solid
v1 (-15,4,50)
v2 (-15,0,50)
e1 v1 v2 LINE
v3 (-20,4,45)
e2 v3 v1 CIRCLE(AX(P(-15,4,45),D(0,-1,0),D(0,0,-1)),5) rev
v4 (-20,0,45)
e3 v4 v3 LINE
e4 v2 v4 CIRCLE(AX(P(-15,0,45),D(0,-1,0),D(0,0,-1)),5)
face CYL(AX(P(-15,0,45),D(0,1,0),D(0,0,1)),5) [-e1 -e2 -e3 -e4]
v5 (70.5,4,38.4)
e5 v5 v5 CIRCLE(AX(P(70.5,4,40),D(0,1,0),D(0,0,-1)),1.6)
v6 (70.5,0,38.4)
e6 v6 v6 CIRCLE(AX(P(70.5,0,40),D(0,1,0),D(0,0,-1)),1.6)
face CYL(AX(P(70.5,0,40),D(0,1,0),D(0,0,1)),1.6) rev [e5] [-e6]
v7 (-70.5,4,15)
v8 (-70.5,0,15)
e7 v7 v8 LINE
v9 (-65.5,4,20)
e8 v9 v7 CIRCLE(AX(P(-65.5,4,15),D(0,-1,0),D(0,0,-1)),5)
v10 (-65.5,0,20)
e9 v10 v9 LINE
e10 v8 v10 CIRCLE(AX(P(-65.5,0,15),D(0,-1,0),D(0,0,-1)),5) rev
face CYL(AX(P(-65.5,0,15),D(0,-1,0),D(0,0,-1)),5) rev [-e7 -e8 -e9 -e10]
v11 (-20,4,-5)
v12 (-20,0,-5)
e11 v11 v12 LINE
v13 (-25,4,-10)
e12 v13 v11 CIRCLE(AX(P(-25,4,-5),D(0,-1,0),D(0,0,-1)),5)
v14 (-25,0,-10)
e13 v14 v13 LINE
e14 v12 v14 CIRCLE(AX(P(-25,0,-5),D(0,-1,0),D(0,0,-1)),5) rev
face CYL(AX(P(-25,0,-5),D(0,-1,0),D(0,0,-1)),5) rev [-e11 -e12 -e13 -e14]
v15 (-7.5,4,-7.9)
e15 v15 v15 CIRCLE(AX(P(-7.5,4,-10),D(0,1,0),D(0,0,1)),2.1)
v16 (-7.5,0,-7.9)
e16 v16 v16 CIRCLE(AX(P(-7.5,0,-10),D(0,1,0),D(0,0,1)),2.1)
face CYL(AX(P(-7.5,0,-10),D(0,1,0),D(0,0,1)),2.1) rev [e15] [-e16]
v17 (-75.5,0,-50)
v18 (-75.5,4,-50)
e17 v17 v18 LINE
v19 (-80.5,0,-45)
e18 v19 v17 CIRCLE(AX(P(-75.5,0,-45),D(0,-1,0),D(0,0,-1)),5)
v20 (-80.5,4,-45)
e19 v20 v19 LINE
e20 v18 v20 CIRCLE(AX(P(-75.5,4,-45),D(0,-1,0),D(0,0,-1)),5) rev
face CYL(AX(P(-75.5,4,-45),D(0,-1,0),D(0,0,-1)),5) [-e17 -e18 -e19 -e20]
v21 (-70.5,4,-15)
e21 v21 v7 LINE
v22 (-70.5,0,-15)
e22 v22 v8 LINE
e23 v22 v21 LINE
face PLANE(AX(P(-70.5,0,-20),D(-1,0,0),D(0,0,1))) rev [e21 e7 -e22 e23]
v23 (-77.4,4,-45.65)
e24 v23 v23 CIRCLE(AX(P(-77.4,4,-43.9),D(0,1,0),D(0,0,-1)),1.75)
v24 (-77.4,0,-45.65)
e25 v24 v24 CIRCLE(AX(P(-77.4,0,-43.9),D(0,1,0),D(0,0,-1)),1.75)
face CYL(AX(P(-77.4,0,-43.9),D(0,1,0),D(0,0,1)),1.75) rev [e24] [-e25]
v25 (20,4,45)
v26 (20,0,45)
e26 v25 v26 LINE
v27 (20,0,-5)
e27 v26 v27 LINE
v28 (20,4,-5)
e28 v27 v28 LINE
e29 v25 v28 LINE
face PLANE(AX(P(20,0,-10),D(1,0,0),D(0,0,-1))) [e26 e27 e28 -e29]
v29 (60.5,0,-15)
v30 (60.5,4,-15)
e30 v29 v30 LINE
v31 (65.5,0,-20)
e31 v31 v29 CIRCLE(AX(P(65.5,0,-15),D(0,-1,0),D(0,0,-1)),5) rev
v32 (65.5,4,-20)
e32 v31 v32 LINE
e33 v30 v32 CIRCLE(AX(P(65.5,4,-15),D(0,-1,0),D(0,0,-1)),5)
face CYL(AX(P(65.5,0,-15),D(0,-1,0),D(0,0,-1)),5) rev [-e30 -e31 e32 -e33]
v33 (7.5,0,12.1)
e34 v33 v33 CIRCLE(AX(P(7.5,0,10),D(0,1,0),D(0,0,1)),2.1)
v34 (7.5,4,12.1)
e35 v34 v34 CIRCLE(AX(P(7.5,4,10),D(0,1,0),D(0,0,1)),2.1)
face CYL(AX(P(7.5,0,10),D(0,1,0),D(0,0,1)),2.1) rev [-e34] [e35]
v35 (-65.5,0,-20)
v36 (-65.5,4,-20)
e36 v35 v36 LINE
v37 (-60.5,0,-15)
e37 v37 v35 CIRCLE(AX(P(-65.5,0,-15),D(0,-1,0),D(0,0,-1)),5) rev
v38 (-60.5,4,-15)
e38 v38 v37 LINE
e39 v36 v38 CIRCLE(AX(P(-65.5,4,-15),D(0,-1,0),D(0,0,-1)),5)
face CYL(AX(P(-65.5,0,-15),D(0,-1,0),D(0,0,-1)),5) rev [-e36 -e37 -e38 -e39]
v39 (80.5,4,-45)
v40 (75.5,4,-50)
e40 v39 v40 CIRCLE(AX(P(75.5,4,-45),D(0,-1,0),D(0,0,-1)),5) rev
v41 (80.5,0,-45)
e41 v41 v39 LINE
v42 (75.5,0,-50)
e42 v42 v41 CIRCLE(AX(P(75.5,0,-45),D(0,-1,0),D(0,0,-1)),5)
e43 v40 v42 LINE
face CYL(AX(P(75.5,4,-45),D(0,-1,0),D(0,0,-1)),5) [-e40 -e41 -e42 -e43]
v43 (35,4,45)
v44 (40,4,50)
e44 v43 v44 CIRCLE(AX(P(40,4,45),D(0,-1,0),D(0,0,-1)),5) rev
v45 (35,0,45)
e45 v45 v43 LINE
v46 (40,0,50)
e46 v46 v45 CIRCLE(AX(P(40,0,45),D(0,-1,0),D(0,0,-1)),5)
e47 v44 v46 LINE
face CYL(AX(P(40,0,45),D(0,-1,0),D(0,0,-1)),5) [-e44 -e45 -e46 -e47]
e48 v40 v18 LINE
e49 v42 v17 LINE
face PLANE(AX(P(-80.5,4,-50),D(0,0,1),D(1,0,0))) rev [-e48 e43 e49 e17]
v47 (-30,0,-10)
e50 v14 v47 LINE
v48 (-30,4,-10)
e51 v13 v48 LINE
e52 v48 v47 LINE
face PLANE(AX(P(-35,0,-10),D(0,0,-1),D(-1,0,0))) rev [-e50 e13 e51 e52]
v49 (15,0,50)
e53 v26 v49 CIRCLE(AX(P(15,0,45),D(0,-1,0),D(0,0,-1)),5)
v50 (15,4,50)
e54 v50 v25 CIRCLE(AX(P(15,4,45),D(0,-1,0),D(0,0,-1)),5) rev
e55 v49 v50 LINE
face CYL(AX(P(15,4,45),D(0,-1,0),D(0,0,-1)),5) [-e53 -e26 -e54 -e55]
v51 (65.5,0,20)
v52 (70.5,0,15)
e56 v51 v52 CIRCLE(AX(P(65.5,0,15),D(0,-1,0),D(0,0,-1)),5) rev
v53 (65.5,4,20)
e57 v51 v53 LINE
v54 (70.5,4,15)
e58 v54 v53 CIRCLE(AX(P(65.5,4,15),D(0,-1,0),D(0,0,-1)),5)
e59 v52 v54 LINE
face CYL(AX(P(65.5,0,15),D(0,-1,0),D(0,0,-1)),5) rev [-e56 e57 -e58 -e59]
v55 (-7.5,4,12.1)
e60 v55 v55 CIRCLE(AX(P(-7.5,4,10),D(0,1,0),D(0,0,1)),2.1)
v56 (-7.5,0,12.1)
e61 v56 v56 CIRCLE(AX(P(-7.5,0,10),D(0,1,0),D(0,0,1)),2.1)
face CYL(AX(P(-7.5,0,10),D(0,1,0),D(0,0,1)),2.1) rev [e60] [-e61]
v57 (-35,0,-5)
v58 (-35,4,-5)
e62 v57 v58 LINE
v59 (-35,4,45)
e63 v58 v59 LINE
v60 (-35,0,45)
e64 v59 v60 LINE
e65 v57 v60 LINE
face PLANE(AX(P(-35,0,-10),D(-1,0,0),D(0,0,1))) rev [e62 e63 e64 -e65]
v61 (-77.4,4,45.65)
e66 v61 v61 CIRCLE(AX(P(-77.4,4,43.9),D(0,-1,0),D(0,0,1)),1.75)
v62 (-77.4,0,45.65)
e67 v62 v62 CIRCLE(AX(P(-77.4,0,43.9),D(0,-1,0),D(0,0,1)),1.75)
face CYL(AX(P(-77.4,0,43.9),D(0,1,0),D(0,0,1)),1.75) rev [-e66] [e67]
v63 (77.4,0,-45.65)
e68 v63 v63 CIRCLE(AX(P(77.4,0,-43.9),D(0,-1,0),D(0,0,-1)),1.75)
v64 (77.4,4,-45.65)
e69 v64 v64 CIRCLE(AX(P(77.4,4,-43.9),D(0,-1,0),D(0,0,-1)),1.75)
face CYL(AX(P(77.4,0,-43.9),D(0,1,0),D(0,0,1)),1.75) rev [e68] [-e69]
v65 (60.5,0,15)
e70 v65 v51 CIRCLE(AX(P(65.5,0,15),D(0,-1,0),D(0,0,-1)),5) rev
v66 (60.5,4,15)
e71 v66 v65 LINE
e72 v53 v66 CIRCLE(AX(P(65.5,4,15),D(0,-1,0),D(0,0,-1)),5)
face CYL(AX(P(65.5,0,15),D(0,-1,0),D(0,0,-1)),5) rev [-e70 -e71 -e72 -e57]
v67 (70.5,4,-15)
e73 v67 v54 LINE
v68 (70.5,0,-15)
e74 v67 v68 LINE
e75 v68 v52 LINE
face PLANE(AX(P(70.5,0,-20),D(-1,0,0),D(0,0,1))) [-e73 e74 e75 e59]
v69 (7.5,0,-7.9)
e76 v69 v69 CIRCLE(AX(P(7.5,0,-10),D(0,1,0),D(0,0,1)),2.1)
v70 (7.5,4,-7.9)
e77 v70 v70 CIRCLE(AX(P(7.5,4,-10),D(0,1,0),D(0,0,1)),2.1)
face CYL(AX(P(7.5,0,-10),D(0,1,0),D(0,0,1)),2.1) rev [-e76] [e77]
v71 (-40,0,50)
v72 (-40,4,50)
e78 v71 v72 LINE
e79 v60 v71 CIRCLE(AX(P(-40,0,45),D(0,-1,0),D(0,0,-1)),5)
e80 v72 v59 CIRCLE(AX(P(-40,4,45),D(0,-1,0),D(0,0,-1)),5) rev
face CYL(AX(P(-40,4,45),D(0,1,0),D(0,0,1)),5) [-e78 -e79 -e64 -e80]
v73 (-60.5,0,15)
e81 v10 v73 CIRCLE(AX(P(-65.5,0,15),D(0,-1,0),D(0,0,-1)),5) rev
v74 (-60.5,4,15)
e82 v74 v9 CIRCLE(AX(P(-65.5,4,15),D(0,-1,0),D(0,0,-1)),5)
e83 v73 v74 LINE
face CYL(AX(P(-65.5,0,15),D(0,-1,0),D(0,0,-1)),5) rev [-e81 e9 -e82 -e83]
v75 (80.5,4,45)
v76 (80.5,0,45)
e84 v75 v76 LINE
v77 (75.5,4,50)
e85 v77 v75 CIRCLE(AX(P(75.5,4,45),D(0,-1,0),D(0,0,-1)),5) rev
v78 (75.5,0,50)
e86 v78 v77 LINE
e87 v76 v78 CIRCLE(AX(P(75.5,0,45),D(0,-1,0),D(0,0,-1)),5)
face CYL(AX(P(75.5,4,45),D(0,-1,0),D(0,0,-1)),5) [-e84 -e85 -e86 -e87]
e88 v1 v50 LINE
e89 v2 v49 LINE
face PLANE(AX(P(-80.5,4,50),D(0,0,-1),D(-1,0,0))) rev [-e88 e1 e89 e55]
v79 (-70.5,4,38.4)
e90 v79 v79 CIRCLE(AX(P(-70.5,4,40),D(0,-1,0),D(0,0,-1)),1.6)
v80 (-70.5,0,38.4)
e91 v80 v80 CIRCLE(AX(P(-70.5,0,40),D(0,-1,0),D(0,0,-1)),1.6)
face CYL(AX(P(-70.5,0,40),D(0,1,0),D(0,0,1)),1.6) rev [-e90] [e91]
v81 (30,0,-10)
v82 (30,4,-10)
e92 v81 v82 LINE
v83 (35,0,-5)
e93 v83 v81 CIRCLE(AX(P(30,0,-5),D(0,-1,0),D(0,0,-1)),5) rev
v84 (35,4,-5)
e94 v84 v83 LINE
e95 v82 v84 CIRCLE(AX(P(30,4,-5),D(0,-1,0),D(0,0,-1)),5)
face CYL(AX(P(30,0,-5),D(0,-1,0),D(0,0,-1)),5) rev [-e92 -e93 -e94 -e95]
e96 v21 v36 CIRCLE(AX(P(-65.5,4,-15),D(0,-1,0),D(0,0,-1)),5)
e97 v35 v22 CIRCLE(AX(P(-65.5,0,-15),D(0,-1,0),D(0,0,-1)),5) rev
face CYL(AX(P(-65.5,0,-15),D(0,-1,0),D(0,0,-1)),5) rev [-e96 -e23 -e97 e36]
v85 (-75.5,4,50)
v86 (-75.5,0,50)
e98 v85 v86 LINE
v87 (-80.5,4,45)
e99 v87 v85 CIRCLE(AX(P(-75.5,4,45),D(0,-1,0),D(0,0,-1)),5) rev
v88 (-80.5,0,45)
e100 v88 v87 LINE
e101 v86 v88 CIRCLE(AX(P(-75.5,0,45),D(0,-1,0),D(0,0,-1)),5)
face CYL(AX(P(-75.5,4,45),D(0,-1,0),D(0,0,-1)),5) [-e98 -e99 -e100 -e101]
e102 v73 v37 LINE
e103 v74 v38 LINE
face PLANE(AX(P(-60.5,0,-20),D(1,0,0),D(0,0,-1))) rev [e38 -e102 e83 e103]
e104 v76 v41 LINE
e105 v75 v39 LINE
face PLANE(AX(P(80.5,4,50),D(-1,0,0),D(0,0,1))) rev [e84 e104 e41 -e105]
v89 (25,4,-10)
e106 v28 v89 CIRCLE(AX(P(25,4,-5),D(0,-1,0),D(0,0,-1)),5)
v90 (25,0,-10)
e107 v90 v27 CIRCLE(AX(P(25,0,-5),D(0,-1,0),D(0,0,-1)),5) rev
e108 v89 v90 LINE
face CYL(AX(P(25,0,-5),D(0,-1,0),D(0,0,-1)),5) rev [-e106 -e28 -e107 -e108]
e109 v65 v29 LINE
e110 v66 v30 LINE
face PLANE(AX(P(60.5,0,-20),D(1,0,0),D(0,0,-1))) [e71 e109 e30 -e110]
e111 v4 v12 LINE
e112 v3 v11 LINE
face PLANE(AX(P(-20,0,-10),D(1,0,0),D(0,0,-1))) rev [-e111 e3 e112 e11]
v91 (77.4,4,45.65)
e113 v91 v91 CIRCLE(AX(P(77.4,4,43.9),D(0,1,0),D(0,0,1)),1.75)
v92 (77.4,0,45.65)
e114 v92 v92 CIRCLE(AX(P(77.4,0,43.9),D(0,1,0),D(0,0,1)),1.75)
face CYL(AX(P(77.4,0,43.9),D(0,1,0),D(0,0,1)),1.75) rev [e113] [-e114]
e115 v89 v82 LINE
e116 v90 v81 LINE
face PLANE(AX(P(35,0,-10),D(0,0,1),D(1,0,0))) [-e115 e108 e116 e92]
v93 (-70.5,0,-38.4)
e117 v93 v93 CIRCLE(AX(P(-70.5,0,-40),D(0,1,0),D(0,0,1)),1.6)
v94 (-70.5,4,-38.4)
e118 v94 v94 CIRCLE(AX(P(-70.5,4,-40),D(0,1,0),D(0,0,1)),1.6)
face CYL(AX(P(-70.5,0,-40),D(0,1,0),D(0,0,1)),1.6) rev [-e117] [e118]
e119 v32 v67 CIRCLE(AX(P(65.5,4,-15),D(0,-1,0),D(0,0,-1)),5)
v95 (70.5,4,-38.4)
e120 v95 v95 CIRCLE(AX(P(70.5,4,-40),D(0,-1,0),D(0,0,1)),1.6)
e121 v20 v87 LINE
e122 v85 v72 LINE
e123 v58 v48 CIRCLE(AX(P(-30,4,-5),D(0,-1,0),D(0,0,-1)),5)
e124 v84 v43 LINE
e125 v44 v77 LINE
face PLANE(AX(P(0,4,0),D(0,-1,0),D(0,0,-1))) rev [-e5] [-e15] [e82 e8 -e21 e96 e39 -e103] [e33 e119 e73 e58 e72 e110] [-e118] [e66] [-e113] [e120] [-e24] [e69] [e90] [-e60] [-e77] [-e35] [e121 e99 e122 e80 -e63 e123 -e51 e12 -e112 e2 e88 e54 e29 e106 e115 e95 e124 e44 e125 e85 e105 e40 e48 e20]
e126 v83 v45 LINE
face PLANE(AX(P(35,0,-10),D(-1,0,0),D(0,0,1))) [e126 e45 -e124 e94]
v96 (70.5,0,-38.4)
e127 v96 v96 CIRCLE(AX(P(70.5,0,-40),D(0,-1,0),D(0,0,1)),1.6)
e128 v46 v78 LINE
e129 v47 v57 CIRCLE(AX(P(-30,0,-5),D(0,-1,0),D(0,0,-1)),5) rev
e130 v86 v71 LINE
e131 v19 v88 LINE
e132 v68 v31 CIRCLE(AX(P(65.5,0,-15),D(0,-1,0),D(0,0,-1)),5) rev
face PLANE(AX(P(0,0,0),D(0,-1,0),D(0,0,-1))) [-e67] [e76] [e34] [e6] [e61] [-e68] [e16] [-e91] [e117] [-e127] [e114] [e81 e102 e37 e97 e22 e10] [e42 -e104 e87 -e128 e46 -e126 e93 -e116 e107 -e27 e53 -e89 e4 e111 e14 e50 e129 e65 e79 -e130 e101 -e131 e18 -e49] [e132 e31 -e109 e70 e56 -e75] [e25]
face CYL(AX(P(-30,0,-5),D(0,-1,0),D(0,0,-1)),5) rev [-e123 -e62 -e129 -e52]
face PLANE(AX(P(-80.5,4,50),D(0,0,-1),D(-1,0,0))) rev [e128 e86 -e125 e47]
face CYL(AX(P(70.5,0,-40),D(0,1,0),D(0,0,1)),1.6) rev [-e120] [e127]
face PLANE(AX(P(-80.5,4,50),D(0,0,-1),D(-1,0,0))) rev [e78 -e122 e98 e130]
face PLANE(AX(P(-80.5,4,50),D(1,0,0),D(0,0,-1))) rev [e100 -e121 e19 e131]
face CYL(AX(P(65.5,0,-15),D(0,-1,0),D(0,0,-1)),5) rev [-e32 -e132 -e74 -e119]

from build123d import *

# Parameters (mm, degrees)
SKETCH1_W               = 161
SKETCH1_H               = 100
BOSS_EXTRUDE1_DEPTH     = 4
SKETCH2_R               = 1.75
CUT_EXTRUDE1_DEPTH      = 95.84856351
MIRROR2_COPY_1_SKETCH_R = 1.75
MIRROR2_COPY_1_DEPTH    = 95.84856351
SKETCH3_W               = 15
SKETCH3_H               = 60
CUT_EXTRUDE2_DEPTH      = 95.84856351
SKETCH4_R               = 1.6
CUT_EXTRUDE3_DEPTH      = 95.84856351
MIRROR5_COPY_1_SKETCH_R = 1.6
MIRROR5_COPY_1_DEPTH    = 95.84856351
SKETCH5_R               = 2.1
CUT_EXTRUDE4_DEPTH      = 95.84856351
SKETCH6_W               = 10
SKETCH6_H               = 40
CUT_EXTRUDE5_DEPTH      = 95.84856351
FILLET1_R               = 5


with BuildPart() as part:
    # Sketch1 → Boss-Extrude1 (new body)
    with BuildSketch(Plane(origin=(0, 0, 0), x_dir=(1, 0, 0), z_dir=(0, 1, 0))):
        Rectangle(SKETCH1_W, SKETCH1_H)
    extrude(amount=BOSS_EXTRUDE1_DEPTH)

    # Sketch2 → Cut-Extrude1 (cut, through all)
    with BuildSketch(Plane(origin=(0, 4, 0), x_dir=(1, 0, 0), z_dir=(0, 1, 0))):
        with Locations(Location((77.4, -43.9, 0), (0, 0, 270))):
            Circle(SKETCH2_R)
    cut_extrude1 = extrude(amount=-CUT_EXTRUDE1_DEPTH, mode=Mode.SUBTRACT)

    # Mirror1: Cut-Extrude1 across plane
    add(cut_extrude1.mirror(Plane.XY), mode=Mode.SUBTRACT)

    # Mirror2: Cut-Extrude1 across plane
    add(cut_extrude1.mirror(Plane(origin=(0, 0, 0), x_dir=(0, 0, 1), z_dir=(1, 0, 0))), mode=Mode.SUBTRACT)

    # Mirror2 copy 1 sketch → Mirror2 copy 1 (cut, through all)
    with BuildSketch(Plane(origin=(0, 4, 0), x_dir=(-1, 0, 0), z_dir=(0, 1, 0))):
        with Locations(Location((77.4, -43.9, 0), (0, 0, 270))):
            Circle(MIRROR2_COPY_1_SKETCH_R)
    extrude(amount=-MIRROR2_COPY_1_DEPTH, mode=Mode.SUBTRACT)

    # Sketch3 → Cut-Extrude2 (cut, through all)
    with BuildSketch(Plane(origin=(0, 4, 0), x_dir=(1, 0, 0), z_dir=(0, 1, 0))):
        with Locations((-27.5, -20)):
            Rectangle(SKETCH3_W, SKETCH3_H)
    cut_extrude2 = extrude(amount=-CUT_EXTRUDE2_DEPTH, mode=Mode.SUBTRACT)

    # Mirror3: Cut-Extrude2 across plane
    add(cut_extrude2.mirror(Plane(origin=(0, 0, 0), x_dir=(0, 0, 1), z_dir=(1, 0, 0))), mode=Mode.SUBTRACT)

    # Sketch4 → Cut-Extrude3 (cut, through all)
    with BuildSketch(Plane(origin=(0, 4, 0), x_dir=(1, 0, 0), z_dir=(0, 1, 0))):
        with Locations(Location((-70.5, 40, 0), (0, 0, 270))):
            Circle(SKETCH4_R)
    cut_extrude3 = extrude(amount=-CUT_EXTRUDE3_DEPTH, mode=Mode.SUBTRACT)

    # Mirror4: Cut-Extrude3 across plane
    add(cut_extrude3.mirror(Plane.XY), mode=Mode.SUBTRACT)

    # Mirror5: Cut-Extrude3 across plane
    add(cut_extrude3.mirror(Plane(origin=(0, 0, 0), x_dir=(0, 0, 1), z_dir=(1, 0, 0))), mode=Mode.SUBTRACT)

    # Mirror5 copy 1 sketch → Mirror5 copy 1 (cut, through all)
    with BuildSketch(Plane(origin=(0, 4, 0), x_dir=(-1, 0, 0), z_dir=(0, 1, 0))):
        with Locations(Location((-70.5, 40, 0), (0, 0, 270))):
            Circle(MIRROR5_COPY_1_SKETCH_R)
    extrude(amount=-MIRROR5_COPY_1_DEPTH, mode=Mode.SUBTRACT)

    # Sketch5 → Cut-Extrude4 (cut, through all)
    with BuildSketch(Plane(origin=(0, 4, 0), x_dir=(1, 0, 0), z_dir=(0, 1, 0))):
        with Locations(Location((-7.5, 10, 0), (0, 0, 270))):
            Circle(SKETCH5_R)
        with Locations(Location((7.5, 10, 0), (0, 0, 270))):
            Circle(SKETCH5_R)
        with Locations(Location((7.5, -10, 0), (0, 0, 270))):
            Circle(SKETCH5_R)
        with Locations(Location((-7.5, -10, 0), (0, 0, 270))):
            Circle(SKETCH5_R)
    extrude(amount=-CUT_EXTRUDE4_DEPTH, mode=Mode.SUBTRACT)

    # Sketch6 → Cut-Extrude5 (cut, through all)
    with BuildSketch(Plane(origin=(0, 4, 0), x_dir=(1, 0, 0), z_dir=(0, 1, 0))):
        with Locations((-65.5, 0)):
            Rectangle(SKETCH6_W, SKETCH6_H)
    cut_extrude5 = extrude(amount=-CUT_EXTRUDE5_DEPTH, mode=Mode.SUBTRACT)

    # Mirror6: Cut-Extrude5 across plane
    add(cut_extrude5.mirror(Plane(origin=(0, 0, 0), x_dir=(0, 0, 1), z_dir=(1, 0, 0))), mode=Mode.SUBTRACT)

    # Fillet1
    fillet1_edges = [part.edges().sort_by_distance(p)[0] for p in [
        (-20, 2, -10),
        (-35, 2, -10),
        (20, 2, -10),
        (35, 2, -10),
        (20, 2, 50),
        (35, 2, 50),
        (-20, 2, 50),
        (-35, 2, 50),
        (-80.5, 2, 50),
        (-80.5, 2, -50),
        (80.5, 2, -50),
        (80.5, 2, 50),
        (60.5, 2, -20),
        (70.5, 2, -20),
        (70.5, 2, 20),
        (60.5, 2, 20),
        (-70.5, 2, -20),
        (-60.5, 2, -20),
        (-60.5, 2, 20),
        (-70.5, 2, 20),
    ]]
    fillet(fillet1_edges, radius=FILLET1_R - 0.0001)  # a hair under: the kernel refuses the full size


solid = part.part
